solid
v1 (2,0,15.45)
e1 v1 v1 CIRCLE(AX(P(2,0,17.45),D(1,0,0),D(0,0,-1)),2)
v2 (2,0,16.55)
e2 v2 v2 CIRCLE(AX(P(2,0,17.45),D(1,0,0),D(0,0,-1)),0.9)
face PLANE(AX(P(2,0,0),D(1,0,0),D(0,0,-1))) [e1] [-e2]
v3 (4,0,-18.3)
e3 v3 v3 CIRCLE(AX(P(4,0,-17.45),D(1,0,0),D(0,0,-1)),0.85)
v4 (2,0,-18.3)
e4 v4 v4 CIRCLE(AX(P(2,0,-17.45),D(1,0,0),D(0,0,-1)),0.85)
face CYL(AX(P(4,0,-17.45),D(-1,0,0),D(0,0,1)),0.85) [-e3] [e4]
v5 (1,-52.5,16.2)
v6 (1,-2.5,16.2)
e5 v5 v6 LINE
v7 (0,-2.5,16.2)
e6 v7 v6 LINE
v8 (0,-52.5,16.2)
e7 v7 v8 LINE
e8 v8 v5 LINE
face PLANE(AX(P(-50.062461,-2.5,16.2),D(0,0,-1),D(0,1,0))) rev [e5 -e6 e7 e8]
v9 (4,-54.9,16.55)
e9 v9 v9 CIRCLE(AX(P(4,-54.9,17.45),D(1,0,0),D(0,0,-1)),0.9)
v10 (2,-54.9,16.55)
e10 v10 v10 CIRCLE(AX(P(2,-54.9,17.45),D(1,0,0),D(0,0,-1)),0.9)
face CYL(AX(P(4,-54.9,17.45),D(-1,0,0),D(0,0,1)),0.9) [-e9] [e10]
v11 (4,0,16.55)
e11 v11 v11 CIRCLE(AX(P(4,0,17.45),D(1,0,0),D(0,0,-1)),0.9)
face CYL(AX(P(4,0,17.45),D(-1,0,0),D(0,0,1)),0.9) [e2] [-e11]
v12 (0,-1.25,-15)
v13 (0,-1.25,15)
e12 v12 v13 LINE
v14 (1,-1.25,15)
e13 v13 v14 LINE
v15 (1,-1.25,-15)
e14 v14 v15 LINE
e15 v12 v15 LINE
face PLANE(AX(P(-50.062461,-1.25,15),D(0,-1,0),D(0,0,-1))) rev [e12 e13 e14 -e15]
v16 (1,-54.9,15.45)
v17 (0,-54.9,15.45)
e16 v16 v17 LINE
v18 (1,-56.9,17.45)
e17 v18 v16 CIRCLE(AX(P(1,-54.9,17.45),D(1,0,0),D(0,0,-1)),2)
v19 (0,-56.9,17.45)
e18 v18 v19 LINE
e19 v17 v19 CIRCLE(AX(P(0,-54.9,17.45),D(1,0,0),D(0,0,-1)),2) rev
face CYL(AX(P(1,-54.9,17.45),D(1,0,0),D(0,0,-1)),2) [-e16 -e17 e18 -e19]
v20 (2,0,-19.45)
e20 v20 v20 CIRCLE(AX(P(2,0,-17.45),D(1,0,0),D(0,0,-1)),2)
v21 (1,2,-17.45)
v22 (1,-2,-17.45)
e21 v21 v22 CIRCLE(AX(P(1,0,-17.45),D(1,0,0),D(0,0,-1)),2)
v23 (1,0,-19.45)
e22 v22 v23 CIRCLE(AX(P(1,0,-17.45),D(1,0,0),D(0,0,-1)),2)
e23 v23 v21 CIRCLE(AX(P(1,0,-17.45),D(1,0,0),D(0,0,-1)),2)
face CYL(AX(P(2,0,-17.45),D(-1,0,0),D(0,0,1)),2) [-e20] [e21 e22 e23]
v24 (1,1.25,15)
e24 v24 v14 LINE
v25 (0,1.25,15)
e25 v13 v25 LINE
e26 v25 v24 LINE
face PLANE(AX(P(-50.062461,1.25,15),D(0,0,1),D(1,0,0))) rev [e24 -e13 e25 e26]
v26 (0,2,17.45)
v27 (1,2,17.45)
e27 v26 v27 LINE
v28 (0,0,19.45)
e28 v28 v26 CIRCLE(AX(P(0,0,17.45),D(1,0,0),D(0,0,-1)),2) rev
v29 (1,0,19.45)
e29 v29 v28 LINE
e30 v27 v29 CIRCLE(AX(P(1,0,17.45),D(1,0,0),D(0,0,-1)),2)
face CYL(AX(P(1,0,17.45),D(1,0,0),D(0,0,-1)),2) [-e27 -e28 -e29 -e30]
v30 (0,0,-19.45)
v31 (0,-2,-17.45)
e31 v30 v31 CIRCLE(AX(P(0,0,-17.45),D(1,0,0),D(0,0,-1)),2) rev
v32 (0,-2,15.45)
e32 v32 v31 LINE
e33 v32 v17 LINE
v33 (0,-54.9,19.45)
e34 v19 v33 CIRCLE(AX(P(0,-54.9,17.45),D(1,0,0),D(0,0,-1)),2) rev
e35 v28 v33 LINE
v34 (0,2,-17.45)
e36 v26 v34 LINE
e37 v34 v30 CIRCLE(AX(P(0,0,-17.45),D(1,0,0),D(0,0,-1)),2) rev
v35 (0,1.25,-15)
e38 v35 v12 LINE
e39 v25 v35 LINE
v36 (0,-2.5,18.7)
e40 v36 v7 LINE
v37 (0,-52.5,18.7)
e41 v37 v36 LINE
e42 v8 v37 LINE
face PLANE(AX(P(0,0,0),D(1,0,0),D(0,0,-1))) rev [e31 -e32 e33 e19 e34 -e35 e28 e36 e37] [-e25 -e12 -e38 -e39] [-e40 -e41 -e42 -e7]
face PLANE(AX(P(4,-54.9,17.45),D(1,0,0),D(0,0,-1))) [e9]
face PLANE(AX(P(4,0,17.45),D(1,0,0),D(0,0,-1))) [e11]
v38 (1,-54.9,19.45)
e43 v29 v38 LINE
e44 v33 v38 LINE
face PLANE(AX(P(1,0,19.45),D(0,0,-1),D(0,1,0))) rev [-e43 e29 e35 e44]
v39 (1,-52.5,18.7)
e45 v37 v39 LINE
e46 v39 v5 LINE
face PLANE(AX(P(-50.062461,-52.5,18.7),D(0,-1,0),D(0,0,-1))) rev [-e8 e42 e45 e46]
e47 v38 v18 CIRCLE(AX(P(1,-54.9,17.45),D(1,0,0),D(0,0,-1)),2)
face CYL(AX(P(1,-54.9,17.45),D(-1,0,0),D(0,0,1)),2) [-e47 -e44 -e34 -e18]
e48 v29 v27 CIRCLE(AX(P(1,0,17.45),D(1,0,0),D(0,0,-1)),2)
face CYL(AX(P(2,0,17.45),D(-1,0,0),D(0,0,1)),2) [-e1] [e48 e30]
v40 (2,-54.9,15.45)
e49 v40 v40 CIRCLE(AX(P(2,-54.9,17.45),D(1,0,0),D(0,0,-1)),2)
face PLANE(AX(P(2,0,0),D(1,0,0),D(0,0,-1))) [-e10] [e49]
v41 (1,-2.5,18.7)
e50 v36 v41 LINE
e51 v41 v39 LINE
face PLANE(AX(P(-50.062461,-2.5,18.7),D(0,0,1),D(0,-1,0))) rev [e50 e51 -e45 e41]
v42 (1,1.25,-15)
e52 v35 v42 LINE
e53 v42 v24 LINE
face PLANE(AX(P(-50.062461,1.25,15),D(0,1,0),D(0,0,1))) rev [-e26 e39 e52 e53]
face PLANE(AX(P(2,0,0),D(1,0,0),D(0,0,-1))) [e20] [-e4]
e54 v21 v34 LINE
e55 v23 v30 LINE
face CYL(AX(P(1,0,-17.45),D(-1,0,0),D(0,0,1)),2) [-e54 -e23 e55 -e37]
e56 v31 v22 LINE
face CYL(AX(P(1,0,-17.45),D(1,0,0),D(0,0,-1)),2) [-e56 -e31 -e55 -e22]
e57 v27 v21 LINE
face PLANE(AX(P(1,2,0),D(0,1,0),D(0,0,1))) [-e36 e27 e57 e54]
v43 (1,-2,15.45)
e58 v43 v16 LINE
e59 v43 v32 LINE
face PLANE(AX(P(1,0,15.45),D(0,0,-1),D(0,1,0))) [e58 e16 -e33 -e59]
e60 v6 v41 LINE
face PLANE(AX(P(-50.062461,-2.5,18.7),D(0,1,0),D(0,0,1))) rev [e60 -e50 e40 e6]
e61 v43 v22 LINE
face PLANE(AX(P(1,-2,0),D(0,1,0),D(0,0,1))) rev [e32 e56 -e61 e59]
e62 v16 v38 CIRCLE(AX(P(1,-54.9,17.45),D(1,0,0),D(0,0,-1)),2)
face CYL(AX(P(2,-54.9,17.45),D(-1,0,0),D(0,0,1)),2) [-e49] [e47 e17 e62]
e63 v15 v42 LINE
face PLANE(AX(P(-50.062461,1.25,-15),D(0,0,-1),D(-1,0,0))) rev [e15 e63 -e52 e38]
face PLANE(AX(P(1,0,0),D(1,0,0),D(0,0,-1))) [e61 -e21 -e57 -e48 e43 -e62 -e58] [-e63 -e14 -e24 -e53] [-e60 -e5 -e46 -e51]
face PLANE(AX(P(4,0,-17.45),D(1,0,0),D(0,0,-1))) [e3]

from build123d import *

# Parameters (mm, degrees)
SKETCH1_W           = 4
SKETCH1_H           = 54.9
SKETCH1_W_2         = 38.9
SKETCH1_H_2         = 4
BOSS_EXTRUDE1_DEPTH = 1
SKETCH2_R           = 2
BOSS_EXTRUDE2_DEPTH = 1
SKETCH3_R           = 0.9
SKETCH3_R_2         = 0.85
BOSS_EXTRUDE3_DEPTH = 2
SKETCH4_W           = 30
SKETCH4_H           = 2.5
SKETCH4_W_2         = 2.5
SKETCH4_H_2         = 50
CUT_EXTRUDE1_DEPTH  = 1
FILLET1_R           = 2


with BuildPart() as part:
    # Sketch1 → Boss-Extrude1 (new body)
    with BuildSketch(Plane(origin=(0, 0, 0), x_dir=(0, 0, -1), z_dir=(1, 0, 0))):
        with Locations((-17.45, -29.45)):
            Rectangle(SKETCH1_W, SKETCH1_H)
        Rectangle(SKETCH1_W_2, SKETCH1_H_2)
    extrude(amount=BOSS_EXTRUDE1_DEPTH)

    # Sketch2 → Boss-Extrude2 (add)
    with BuildSketch(Plane(origin=(1, 0, 0), x_dir=(0, 0, -1), z_dir=(1, 0, 0))):
        with Locations(Location((-17.45, 0, 0), (0, 0, 180))):
            Circle(SKETCH2_R)
        with Locations((17.45, 0)):
            Circle(SKETCH2_R)
        with Locations((-17.45, -54.9)):
            Circle(SKETCH2_R)
    extrude(amount=BOSS_EXTRUDE2_DEPTH)

    # Sketch3 → Boss-Extrude3 (add)
    with BuildSketch(Plane(origin=(2, 0, 0), x_dir=(0, 0, -1), z_dir=(1, 0, 0))):
        with Locations((-17.45, 0)):
            Circle(SKETCH3_R)
        with Locations((17.45, 0)):
            Circle(SKETCH3_R_2)
        with Locations((-17.45, -54.9)):
            Circle(SKETCH3_R)
    extrude(amount=BOSS_EXTRUDE3_DEPTH)

    # Sketch4 → Cut-Extrude1 (cut)
    with BuildSketch(Plane(origin=(1, 0, 0), x_dir=(0, 0, -1), z_dir=(1, 0, 0))):
        Rectangle(SKETCH4_W, SKETCH4_H)
        with Locations((-17.45, -27.5)):
            Rectangle(SKETCH4_W_2, SKETCH4_H_2)
    extrude(amount=-CUT_EXTRUDE1_DEPTH, mode=Mode.SUBTRACT)

    # Fillet1
    fillet1_edges = [part.edges().sort_by_distance(p)[0] for p in [
        (0.5, 2, 19.45),
        (0.5, 2, -19.45),
        (0.5, -2, -19.45),
        (0.5, -56.9, 15.45),
        (0.5, -56.9, 19.45),
    ]]
    fillet(fillet1_edges, radius=FILLET1_R - 0.0001)  # a hair under: the kernel refuses the full size


solid = part.part
